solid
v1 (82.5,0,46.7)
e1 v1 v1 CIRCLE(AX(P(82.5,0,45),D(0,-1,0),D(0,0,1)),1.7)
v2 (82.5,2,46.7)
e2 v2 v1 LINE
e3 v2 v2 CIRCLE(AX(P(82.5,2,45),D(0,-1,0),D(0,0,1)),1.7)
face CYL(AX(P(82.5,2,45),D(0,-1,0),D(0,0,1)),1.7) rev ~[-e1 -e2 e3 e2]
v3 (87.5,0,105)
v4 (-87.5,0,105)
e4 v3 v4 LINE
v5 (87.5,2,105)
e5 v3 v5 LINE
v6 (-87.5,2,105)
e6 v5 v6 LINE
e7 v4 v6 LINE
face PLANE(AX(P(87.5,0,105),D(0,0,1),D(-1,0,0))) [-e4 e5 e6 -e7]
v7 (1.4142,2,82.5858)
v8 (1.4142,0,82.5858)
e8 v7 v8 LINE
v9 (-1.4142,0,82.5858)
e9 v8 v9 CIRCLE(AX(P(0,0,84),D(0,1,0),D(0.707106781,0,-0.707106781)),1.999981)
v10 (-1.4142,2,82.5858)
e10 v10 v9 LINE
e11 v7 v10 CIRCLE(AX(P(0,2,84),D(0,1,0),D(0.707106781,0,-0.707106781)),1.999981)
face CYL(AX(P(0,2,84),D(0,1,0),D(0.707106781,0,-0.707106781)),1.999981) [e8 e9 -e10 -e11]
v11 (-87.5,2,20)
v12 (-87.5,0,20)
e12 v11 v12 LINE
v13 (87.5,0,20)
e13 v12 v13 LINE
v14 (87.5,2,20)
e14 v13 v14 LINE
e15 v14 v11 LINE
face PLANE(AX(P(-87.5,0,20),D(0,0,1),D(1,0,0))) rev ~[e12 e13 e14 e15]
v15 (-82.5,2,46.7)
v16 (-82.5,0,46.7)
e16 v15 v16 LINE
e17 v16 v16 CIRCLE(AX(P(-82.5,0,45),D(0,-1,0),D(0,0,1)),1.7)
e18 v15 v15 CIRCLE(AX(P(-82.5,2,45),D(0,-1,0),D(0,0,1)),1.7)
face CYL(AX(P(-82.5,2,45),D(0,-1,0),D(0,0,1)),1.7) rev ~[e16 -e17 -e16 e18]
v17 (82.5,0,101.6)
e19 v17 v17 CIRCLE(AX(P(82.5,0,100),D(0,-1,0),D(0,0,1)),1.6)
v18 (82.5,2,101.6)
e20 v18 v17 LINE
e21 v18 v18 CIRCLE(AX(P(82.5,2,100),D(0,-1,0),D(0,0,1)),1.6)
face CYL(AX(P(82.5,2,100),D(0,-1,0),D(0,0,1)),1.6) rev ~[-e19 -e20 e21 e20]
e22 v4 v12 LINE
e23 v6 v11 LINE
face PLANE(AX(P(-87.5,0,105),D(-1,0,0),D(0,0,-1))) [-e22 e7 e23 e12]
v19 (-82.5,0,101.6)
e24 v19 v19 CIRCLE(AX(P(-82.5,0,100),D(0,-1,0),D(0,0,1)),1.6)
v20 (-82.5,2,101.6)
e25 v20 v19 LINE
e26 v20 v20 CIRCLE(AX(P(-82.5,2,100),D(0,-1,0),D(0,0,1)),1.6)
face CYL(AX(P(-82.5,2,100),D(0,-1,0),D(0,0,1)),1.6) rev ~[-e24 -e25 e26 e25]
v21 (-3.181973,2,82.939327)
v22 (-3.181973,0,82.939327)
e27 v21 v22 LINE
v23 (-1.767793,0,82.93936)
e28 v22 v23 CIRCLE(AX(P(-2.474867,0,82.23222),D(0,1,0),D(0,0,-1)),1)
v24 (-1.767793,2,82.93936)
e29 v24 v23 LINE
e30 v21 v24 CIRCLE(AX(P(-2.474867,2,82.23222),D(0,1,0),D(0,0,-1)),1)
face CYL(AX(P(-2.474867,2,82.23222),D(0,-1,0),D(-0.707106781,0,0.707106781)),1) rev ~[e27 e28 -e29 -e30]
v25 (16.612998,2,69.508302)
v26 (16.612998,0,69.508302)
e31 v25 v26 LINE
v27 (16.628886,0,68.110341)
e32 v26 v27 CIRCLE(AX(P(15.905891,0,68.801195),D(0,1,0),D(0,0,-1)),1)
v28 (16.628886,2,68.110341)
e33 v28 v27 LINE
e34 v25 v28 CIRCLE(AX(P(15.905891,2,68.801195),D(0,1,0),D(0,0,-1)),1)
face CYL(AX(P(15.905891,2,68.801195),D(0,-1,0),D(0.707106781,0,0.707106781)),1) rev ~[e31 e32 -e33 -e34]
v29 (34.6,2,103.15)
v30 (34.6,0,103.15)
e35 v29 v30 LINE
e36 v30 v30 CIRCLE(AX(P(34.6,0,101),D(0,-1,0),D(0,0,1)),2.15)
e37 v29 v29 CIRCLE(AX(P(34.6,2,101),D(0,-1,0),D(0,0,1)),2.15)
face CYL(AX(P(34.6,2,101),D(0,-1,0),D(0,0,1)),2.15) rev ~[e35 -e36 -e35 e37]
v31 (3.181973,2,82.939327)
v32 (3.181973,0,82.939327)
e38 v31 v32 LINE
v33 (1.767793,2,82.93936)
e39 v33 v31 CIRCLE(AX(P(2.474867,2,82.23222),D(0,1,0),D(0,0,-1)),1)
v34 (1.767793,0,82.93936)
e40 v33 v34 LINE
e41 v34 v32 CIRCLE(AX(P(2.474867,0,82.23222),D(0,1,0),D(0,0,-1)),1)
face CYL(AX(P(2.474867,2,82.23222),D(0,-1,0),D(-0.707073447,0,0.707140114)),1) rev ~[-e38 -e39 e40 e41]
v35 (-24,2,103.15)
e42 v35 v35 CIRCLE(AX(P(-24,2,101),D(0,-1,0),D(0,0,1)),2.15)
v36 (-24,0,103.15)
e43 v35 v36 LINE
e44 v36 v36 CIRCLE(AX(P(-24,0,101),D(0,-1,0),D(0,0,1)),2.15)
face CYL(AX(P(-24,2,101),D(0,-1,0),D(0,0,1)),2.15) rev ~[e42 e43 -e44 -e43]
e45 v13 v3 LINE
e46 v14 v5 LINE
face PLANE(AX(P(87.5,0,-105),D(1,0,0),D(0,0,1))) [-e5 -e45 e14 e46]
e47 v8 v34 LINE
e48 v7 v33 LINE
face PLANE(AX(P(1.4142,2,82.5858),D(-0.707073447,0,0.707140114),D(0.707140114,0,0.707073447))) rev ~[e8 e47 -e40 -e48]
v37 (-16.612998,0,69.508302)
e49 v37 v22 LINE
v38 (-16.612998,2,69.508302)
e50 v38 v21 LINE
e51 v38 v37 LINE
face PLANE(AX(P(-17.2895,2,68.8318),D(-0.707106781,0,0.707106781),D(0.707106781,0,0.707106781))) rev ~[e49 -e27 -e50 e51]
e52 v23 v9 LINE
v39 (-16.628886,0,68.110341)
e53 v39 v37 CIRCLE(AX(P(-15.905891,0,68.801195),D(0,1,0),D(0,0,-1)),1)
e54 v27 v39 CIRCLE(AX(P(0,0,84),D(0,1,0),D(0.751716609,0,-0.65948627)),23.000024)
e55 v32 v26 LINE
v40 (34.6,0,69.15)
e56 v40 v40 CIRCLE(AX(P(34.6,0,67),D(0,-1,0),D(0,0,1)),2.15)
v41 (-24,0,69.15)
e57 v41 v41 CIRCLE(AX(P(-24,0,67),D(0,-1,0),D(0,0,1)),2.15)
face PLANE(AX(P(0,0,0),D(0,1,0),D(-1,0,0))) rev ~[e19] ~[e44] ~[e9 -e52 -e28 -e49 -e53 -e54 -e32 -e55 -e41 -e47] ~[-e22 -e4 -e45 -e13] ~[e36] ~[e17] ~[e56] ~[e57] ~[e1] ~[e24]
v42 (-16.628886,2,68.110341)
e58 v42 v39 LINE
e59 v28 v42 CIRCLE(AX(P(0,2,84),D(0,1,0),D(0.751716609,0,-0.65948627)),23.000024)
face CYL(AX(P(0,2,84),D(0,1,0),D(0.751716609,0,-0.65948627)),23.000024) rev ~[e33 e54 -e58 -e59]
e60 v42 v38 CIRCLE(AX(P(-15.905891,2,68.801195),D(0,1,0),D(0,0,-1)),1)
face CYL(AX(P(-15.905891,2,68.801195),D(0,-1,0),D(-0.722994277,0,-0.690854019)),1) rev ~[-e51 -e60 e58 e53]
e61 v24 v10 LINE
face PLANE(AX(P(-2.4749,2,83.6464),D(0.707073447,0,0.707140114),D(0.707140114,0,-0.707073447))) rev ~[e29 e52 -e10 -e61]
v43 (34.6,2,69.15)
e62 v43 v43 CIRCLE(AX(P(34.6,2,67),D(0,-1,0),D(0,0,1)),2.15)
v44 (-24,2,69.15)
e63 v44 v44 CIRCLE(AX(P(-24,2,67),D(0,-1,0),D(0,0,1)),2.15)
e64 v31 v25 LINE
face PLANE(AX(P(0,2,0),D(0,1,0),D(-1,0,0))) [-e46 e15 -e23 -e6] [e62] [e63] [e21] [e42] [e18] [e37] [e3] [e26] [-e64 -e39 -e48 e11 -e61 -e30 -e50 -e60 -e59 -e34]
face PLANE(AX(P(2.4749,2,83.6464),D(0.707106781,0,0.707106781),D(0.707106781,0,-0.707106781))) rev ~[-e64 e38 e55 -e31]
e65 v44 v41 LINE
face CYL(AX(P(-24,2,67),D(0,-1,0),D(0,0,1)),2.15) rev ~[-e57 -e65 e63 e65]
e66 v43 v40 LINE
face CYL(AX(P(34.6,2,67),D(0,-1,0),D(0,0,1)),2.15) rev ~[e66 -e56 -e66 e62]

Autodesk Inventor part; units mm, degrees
ref_plane "YZ Plane" through (0, 0, 0) normal (1, 0, 0) x (0, 1, 0)
ref_plane "XZ Plane" through (0, 0, 0) normal (0, 1, 0) x (-1, 0, 0)
ref_plane "XY Plane" through (0, 0, 0) normal (0, 0, 1) x (1, 0, 0)
sketch "スケッチ1" plane through (0, 0, 0) normal (0, 1, 0) x (-1, 0, 0)
  line L0 (-87.5, 105) -> (87.5, 105)
  line L1 (87.5, 105) -> (87.5, -105)
  line L2 (87.5, -105) -> (-87.5, -105)
  line L3 (-87.5, -105) -> (-87.5, 105)
  line L4 (-87.5, 105) -> (87.5, -105) construction
  line L5 (87.5, 105) -> (-87.5, -105) construction
  point P0 (0, 0)
  dimension "d0" = 210
  dimension "d1" = 175
extrude "プレート1" add sketch "スケッチ1" along normal blind 2
sketch "スケッチ5" plane through (0, 2, 0) normal (0, 1, 0) x (1, 0, 0)
  line L0 (-24, -101) -> (34.6, -101)
  line L1 (34.6, -101) -> (34.6, -67)
  line L2 (34.6, -67) -> (-24, -67)
  line L3 (-24, -67) -> (-24, -101)
  line L4 (-24, -101) -> (34.6, -67) construction
  line L5 (34.6, -101) -> (-24, -67) construction
  line L6 (87.5, -105) -> (-87.5, -105) projected
  point P0 (0, 0)
  point P1 (0, -84)
  point P2 (5.3, -84)
  point P3 (5.3, -84)
  dimension "d31" = 58.6
  dimension "d32" = 24
  dimension "d33" = 34
  dimension "d78" = 4
hole "穴3" at (34.6, 2, 67) at (34.6, 2, 101) at (-24, 2, 67) at (-24, 2, 101) direction (0, -1, 0) diameter 4.3 end through all clearance for "Socket Head Cap Screw" size "M4" standard "Ansi Metric M Profile"
sketch "スケッチ6" plane through (0, 2, 0) normal (0, 1, 0) x (1, 0, 0)
  line L0 (-133.9967, -217.2896) -> (133.2896, 49.9967)
  line L1 (133.2896, 49.9967) -> (133.9967, 49.2896)
  line L2 (133.9967, 49.2896) -> (-133.2896, -217.9967)
  line L3 (-133.2896, -217.9967) -> (-133.9967, -217.2896)
  line L4 (-133.9967, -217.2896) -> (133.9967, 49.2896) construction
  line L5 (133.2896, 49.9967) -> (-133.2896, -217.9967) construction
  line L6 (133.9967, -217.2896) -> (-133.2896, 49.9967)
  line L7 (-133.2896, 49.9967) -> (-133.9967, 49.2896)
  line L8 (-133.9967, 49.2896) -> (133.2896, -217.9967)
  line L9 (133.2896, -217.9967) -> (133.9967, -217.2896)
  line L10 (133.9967, -217.2896) -> (-133.9967, 49.2896) construction
  line L11 (-133.2896, 49.9967) -> (133.2896, -217.9967) construction
  line L12 (-2.4749, -82.2322) -> (-1.7678, -81.5251)
  circle A0 centre (0, -84) radius 22
  line L13 (2.4749, -82.2322) -> (1.7678, -81.5251)
  circle A1 centre (0, -84) radius 3
  line L14 (-87.5, -105) -> (-87.5, 105) projected
  line L15 (87.5, 105) -> (87.5, -105) projected
  line L16 (122.5, 0) -> (-122.5, 0) projected
  point P0 (0, 0)
  point P1 (0, -84)
  point P2 (-2.1213, -81.8787)
  point P3 (2.1213, -81.8787)
  point P4 (15.9059, -68.8012)
  point P5 (-15.9059, -68.8012)
  dimension "d54" = 1
  dimension "d55" = 1
  dimension "d57" = 44
  dimension "d59" = 3
  dimension "d60" = 3
  dimension "d65" = 186
  dimension "d66" = 186
  dimension "d79" = 45
  dimension "d80" = 45
extrude "押し出し2" cut sketch "スケッチ6" against normal blind 10 contours A0 L6 L12 L8 | A0 L0 A1 L6 | L12 L6 A1 | A0 L2 L13 L0 | L0 L13 A1
sketch "スケッチ7" plane through (0, 2, 0) normal (0, 1, 0) x (1, 0, 0)
  line L0 (-82.5, -100) -> (82.5, -100)
  line L1 (82.5, -100) -> (82.5, 100)
  line L2 (82.5, 100) -> (-82.5, 100)
  line L3 (-82.5, 100) -> (-82.5, -100)
  line L4 (-82.5, -100) -> (82.5, 100) construction
  line L5 (82.5, -100) -> (-82.5, 100) construction
  line L6 (-87.5, -105) -> (-87.5, 105) projected
  line L7 (87.5, -105) -> (-87.5, -105) projected
  point P0 (0, 0)
  point P1 (-82.5, -45)
  point P2 (-82.5, -10)
  point P3 (82.5, -45)
  point P4 (82.5, -10)
  dimension "d45" = 5
  dimension "d46" = 5
  dimension "d67" = 55
  dimension "d68" = 35
  dimension "d69" = 55
  dimension "d70" = 35
hole "穴4" at (-82.5, 2, -100) at (82.5, 2, -100) at (-82.5, 2, 100) at (82.5, 2, 100) direction (0, -1, 0) diameter 3.2 end through all clearance for "Socket Head Cap Screw" size "M3" standard "Ansi Metric M Profile"
sketch "スケッチ8" plane through (0, 2, 0) normal (0, 1, 0) x (1, 0, 0)
  line L0 (15.9059, -68.8012) -> (2.4749, -82.2322) projected
  line L1 (-2.1213, -81.8787) -> (-2.4749, -82.2322) projected
  arc A0 (2.1213, -81.8787) -> (-2.1213, -81.8787) centre (0, -84) ccw projected
  line L2 (2.4749, -82.2322) -> (2.1213, -81.8787) projected
  line L3 (-2.4749, -82.2322) -> (-15.9059, -68.8012) projected
  arc A1 (15.9059, -68.8012) -> (-15.9059, -68.8012) centre (0, -84) ccw projected
  line L4 (2.4749, -83.6464) -> (17.2895, -68.8318)
  arc A2 (17.2895, -68.8318) -> (-17.2895, -68.8318) centre (0, -84) ccw
  line L5 (-17.2895, -68.8318) -> (-2.4749, -83.6464)
  line L6 (-2.4749, -83.6464) -> (-1.4142, -82.5858)
  arc A3 (1.4142, -82.5858) -> (-1.4142, -82.5858) centre (0, -84) ccw
  line L7 (1.4142, -82.5858) -> (2.4749, -83.6464)
  point P0 (0, 0)
  dimension "d61" = 1
extrude "押し出し3" cut sketch "スケッチ8" against normal blind 10 contours L0 L2 A0 L1 L3 A1 | L7 A3 L6 L5 A2 L4
fillet "コーナーR1" radius 1 4 edges at (-2.4749, 1, 83.6464) (2.4749, 1, 83.6464) (-17.2895, 1, 68.8318) (17.2895, 1, 68.8318)
hole "穴5" at (-82.5, 2, 45) at (-82.5, 2, 10) at (82.5, 2, 45) at (82.5, 2, 10) direction (0, -1, 0) diameter 3.4 end through all clearance for "Flat Head Machine Screw" size "M3" standard "Ansi Metric M Profile"
ref_plane "作業平面1" through (-87.5, 0, 20) normal (0, 0, 1) x (1, 0, 0)
sketch "スケッチ9" plane through (-87.5, 0, 20) normal (0, 0, 1) x (1, 0, 0)
  line L0 (175, 0) -> (175, 2) projected
  line L1 (0, 0) -> (175, 0)
  line L2 (175, 0) -> (175, 2)
  line L3 (175, 2) -> (0, 2)
  line L4 (0, 2) -> (0, 0)
  point P0 (87.5, 0)
extrude "押し出し4" cut sketch "スケッチ9" against normal blind 159
equation "\"d40\" = Thickness"
equation "\"d60\" = d59"
equation "\"d66\" = d65"
equation "\"d69\" = d67"
equation "\"d70\" = d68"
equation "\"d76\" = Thickness"
equation "\"d2\" = Thickness"
equation "\"BendRadius\" = Thickness"
equation "\"BendReliefWidth\" = Thickness"
equation "\"BendReliefDepth\" = 0.5 * Thickness"
equation "\"CornerReliefSize\" = 4 * Thickness"
equation "\"MinimumRemnant\" = 2 * Thickness"
equation "\"TransitionRadius\" = BendRadius"
equation "\"JacobiRadiusSize\" = BendRadius"
equation "\"GapSize\" = Thickness"
equation "\"Thickness\" = 2"
properties part number "s_carbon_plate1" material "CFRP"
